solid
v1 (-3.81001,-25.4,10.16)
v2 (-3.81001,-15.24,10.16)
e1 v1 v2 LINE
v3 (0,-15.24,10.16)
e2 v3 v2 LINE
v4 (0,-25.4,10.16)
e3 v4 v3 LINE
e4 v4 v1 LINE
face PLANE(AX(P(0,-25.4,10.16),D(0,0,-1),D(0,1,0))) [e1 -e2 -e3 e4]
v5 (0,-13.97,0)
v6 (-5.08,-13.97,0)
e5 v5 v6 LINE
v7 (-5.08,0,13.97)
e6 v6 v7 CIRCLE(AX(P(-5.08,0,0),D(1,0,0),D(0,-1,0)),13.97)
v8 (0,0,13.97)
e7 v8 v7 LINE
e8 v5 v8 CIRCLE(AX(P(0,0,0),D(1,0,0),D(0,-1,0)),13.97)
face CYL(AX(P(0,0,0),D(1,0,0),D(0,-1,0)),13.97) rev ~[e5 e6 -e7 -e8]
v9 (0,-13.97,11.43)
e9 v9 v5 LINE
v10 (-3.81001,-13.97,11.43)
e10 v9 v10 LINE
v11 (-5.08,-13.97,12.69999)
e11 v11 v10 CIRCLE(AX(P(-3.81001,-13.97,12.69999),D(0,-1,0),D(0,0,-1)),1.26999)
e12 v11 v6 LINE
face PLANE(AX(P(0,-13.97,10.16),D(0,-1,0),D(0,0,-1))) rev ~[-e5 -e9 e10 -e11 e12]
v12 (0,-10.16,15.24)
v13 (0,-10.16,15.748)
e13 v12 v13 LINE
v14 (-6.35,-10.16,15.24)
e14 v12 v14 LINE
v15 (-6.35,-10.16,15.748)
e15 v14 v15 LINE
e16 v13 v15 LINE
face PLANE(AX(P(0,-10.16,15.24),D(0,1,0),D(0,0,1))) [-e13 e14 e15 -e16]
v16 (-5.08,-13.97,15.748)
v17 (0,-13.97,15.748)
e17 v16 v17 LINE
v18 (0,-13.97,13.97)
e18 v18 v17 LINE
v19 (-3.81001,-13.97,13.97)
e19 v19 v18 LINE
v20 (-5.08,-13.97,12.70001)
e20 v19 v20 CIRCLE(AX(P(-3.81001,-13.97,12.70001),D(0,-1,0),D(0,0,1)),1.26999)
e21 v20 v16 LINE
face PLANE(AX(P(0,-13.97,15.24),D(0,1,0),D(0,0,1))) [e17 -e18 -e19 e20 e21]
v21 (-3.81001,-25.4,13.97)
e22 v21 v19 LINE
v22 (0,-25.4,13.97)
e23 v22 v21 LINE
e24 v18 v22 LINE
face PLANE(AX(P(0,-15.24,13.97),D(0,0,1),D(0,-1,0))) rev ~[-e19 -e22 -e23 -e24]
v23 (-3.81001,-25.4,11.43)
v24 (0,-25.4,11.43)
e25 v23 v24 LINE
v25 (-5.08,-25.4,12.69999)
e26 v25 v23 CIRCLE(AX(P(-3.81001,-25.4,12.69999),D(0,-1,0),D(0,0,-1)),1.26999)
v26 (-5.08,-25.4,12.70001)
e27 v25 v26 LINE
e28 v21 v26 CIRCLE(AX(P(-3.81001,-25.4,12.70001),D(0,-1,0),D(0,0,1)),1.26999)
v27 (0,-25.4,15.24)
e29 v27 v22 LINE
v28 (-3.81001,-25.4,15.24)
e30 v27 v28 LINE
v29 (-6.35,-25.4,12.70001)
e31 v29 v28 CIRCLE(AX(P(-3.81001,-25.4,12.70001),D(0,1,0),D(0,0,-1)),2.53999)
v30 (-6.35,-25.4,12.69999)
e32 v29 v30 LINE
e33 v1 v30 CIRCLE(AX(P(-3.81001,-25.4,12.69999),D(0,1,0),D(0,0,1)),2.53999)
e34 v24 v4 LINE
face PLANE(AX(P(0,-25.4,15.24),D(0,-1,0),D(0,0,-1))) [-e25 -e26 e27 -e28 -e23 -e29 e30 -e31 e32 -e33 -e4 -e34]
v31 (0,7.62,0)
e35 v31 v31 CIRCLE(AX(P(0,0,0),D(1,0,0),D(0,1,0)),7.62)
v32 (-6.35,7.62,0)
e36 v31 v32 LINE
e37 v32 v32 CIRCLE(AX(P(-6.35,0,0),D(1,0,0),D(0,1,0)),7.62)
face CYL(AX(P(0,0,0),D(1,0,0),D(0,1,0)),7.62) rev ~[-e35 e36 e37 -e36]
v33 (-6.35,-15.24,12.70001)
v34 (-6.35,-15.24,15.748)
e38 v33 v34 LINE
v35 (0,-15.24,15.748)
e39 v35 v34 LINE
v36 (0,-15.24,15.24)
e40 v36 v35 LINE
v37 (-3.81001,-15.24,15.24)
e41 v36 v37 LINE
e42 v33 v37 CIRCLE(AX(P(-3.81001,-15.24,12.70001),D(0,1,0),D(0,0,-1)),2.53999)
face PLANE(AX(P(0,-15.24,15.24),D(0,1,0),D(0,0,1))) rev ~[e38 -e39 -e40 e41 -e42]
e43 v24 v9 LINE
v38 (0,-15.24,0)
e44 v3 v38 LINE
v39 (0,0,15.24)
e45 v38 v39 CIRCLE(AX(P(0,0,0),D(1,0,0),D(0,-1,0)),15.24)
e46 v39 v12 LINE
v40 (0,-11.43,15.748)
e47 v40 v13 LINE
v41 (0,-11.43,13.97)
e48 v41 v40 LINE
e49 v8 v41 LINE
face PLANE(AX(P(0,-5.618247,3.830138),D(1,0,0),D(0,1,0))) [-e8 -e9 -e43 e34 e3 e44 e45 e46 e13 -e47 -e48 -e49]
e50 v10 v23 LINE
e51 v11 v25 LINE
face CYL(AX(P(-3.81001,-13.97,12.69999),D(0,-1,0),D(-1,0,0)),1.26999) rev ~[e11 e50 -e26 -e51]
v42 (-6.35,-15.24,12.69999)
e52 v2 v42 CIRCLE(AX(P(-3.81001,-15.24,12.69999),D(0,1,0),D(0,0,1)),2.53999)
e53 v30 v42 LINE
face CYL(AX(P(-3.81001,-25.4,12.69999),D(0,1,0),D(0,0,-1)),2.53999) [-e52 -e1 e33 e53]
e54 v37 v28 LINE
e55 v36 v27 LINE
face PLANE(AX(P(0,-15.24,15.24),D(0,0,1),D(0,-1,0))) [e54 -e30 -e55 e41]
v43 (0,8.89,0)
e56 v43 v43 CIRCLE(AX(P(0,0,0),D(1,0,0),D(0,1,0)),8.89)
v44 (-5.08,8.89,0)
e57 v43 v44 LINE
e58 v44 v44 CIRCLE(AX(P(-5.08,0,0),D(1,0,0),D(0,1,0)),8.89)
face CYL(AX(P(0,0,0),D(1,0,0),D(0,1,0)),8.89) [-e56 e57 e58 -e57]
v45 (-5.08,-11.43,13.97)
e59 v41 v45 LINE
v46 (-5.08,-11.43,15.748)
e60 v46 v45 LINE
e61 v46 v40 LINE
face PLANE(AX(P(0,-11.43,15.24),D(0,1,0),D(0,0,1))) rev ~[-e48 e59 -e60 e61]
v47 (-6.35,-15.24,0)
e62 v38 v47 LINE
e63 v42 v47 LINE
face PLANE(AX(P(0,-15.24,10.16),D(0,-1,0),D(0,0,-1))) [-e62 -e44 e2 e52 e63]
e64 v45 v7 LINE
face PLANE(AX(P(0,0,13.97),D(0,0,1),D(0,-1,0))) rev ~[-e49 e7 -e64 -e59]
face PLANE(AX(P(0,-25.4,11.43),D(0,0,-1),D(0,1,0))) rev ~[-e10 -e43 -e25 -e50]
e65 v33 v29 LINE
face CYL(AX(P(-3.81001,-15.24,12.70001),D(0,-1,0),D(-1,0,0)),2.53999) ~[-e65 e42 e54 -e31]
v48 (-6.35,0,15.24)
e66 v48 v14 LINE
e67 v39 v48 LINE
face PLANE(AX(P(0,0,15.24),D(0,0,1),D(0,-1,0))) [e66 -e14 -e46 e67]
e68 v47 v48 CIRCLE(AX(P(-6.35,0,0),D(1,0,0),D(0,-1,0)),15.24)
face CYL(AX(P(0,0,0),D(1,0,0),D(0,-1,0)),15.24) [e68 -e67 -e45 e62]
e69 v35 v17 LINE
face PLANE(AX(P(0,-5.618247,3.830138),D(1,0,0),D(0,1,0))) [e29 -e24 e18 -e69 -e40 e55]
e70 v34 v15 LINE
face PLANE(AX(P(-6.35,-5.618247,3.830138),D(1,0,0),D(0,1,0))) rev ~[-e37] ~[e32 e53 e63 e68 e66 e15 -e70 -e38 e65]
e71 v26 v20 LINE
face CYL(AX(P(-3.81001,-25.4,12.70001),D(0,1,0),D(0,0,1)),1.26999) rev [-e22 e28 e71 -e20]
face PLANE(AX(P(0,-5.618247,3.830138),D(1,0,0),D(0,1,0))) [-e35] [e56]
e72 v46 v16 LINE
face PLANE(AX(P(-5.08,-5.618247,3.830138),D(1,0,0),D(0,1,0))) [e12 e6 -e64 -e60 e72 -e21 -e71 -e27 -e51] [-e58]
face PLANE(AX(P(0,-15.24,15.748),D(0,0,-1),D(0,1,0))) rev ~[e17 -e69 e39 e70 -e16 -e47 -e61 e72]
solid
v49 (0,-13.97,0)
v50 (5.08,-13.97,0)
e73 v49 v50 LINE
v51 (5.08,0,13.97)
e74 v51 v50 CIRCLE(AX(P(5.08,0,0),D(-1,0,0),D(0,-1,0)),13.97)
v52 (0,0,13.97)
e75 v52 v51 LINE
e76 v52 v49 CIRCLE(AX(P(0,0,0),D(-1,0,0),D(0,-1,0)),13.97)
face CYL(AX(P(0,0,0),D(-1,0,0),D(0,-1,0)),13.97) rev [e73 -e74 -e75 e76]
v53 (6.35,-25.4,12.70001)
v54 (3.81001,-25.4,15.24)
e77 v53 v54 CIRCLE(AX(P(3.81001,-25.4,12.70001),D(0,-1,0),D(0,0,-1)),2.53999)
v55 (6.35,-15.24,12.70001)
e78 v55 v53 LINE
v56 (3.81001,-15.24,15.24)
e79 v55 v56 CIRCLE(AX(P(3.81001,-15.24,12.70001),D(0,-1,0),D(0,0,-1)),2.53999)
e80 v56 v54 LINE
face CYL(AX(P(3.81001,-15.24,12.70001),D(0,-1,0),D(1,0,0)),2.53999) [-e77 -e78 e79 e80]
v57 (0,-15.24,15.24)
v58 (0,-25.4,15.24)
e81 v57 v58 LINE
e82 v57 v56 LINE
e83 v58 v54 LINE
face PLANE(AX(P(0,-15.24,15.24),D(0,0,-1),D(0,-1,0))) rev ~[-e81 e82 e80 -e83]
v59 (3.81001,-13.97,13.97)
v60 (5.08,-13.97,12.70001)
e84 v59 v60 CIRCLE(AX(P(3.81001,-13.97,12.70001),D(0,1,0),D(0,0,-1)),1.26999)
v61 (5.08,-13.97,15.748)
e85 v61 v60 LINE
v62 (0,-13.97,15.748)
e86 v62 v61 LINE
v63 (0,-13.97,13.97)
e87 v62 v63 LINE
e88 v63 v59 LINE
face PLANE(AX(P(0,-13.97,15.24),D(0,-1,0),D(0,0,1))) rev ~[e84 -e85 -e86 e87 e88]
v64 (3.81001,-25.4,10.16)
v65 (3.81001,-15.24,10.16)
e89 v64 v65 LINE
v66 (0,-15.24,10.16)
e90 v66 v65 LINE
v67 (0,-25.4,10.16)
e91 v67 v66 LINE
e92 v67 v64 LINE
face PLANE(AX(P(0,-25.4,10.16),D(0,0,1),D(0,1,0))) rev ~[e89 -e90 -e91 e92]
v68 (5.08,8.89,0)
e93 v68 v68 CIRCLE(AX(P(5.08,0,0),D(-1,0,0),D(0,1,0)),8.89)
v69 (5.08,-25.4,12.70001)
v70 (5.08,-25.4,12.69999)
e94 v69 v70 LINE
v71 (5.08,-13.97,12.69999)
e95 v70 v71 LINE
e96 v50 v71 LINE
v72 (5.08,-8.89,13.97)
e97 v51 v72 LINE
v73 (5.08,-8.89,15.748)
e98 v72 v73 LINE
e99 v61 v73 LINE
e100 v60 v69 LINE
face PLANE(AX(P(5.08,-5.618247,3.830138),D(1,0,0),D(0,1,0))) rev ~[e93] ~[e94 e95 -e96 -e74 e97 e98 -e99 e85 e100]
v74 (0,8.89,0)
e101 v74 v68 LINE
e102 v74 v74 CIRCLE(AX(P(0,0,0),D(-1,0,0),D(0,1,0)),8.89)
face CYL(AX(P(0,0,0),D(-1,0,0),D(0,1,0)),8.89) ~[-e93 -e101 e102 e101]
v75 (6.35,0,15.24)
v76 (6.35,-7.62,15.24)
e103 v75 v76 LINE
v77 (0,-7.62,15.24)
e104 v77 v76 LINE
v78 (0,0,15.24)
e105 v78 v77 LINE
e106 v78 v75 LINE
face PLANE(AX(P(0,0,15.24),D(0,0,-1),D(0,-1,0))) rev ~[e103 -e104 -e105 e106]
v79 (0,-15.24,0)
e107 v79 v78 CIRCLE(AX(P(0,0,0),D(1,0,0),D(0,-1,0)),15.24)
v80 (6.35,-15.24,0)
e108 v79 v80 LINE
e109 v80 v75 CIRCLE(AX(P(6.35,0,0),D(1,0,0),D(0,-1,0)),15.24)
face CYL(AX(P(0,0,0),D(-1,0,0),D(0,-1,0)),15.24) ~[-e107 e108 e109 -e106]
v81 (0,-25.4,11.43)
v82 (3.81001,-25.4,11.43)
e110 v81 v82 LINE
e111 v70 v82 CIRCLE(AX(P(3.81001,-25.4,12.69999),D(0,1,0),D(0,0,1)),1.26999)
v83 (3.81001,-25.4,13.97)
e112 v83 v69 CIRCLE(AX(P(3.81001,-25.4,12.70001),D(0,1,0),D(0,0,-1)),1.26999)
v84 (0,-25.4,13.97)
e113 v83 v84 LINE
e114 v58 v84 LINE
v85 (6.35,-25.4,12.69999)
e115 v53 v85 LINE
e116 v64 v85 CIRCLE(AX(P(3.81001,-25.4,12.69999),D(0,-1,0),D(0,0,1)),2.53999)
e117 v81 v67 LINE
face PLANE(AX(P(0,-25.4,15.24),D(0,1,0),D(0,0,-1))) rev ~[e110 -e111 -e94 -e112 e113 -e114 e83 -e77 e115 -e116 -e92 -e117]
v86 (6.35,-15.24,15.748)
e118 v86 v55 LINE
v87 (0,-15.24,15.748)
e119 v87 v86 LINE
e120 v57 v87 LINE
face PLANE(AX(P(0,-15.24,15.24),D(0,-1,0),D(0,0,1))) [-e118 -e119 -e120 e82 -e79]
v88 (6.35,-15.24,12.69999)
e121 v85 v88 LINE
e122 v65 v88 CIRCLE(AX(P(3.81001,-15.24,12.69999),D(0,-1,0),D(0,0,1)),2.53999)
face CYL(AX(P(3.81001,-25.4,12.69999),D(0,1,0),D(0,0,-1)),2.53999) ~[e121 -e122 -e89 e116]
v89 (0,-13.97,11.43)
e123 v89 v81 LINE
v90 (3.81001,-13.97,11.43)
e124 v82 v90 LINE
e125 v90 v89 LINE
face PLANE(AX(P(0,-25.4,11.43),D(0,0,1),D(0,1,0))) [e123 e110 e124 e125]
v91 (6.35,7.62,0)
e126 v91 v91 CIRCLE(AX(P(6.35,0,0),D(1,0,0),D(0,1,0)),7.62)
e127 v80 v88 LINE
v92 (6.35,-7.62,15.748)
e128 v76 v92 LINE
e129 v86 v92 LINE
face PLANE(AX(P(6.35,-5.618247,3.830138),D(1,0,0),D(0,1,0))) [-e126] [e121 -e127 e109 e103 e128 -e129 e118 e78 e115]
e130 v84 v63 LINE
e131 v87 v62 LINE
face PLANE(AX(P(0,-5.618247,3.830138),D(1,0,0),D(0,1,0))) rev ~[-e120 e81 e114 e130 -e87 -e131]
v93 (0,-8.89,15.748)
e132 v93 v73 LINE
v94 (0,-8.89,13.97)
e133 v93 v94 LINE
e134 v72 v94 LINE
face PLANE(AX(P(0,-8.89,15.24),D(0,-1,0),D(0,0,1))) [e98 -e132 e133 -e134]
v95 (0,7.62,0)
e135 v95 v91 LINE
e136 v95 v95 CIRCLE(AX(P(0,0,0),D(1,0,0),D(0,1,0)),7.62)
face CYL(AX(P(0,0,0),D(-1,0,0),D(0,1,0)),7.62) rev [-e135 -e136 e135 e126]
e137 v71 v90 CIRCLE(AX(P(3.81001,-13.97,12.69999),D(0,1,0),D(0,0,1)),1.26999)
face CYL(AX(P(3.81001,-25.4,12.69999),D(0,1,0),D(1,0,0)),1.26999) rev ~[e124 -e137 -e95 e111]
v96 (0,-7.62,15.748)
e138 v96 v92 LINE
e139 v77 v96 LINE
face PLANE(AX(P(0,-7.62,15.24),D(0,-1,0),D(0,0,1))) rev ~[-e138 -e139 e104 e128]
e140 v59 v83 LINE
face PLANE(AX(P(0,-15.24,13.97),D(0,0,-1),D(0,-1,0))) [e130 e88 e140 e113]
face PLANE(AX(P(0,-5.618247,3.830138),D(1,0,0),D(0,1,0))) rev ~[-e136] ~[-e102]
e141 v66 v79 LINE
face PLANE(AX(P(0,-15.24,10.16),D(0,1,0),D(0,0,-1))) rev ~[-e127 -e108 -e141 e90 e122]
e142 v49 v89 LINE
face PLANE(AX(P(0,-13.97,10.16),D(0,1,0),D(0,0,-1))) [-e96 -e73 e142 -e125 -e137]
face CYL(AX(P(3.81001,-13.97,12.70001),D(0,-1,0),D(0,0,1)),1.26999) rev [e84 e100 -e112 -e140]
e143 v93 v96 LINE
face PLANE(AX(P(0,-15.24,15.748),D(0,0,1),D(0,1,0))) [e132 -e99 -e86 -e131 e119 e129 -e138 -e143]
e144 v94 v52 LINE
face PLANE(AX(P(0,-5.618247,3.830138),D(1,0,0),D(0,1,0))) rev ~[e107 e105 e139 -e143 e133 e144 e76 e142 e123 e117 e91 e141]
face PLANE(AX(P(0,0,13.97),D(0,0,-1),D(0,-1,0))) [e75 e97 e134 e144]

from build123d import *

# Parameters (mm, degrees)
F0_R     = 7.62
F0_W     = 5.08
F0_H     = 0.508
F1_DEPTH = 6.35
F2_T     = -1.27
F3_R     = 7.62
F3_W     = 7.62
F3_H     = 0.508
F4_DEPTH = 6.35
F5_T     = -1.27
F6_R     = 2.53999
F6_2_R   = 2.53999
F7_R     = 1.26999
F7_2_R   = 1.26999


# Not quite as in the source:
# - a fillet or chamfer is up to 0.001 mm smaller than in the source, because OpenCascade refuses the exact size


with BuildPart() as f1:
    # F0 (on Right) → F1 (new body)
    with BuildSketch(Plane.YZ):
        with BuildLine():
            Line((-15.24, 15.24), (-25.4, 15.24))
            Line((-25.4, 15.24), (-25.4, 10.16))
            Line((-25.4, 10.16), (-15.24, 10.16))
            Line((-15.24, 10.16), (-15.24, 0))
            ThreePointArc((-15.24, 0), (10.7763073453, -10.7763073453), (0, 15.24))
            Line((0, 15.24), (-10.16, 15.24))
            Line((-10.16, 15.24), (-15.24, 15.24))
        make_face()
        Circle(F0_R, mode=Mode.SUBTRACT)
        with Locations((-12.7, 15.494)):
            Rectangle(F0_W, F0_H)
    extrude(amount=-F1_DEPTH)

    # F2
    f2_openings = [f1.faces().sort_by_distance(p)[0] for p in [
        (-3.175, -25.4, 12.7),
        (-3.175, -12.7, 15.748),
        (0, -5.08, 14.728936),
    ]]
    offset(amount=F2_T, openings=f2_openings, kind=Kind.INTERSECTION)

    # F6 (radius 2.54 in the source; OpenCascade refuses exactly that, so slightly less here)
    f6_edges = [f1.edges().sort_by_distance(p)[0] for p in [
        (-6.35, -20.32, 15.24),
        (-6.35, -20.32, 10.16),
    ]]
    fillet(f6_edges, radius=F6_R)

    # F7 (radius 1.27 in the source; OpenCascade refuses exactly that, so slightly less here)
    f7_edges = [f1.edges().sort_by_distance(p)[0] for p in [
        (-5.08, -19.685, 13.97),
        (-5.08, -19.685, 11.43),
    ]]
    fillet(f7_edges, radius=F7_R)


with BuildPart() as f4:
    # F3 (on Right) → F4 (new body)
    with BuildSketch(Plane.YZ):
        with BuildLine():
            Line((-15.24, 15.24), (-25.4, 15.24))
            Line((-25.4, 15.24), (-25.4, 10.16))
            Line((-25.4, 10.16), (-15.24, 10.16))
            Line((-15.24, 10.16), (-15.24, 0))
            ThreePointArc((-15.24, 0), (10.7763073453, -10.7763073453), (0, 15.24))
            Line((0, 15.24), (-7.62, 15.24))
            Line((-7.62, 15.24), (-15.24, 15.24))
        make_face()
        Circle(F3_R, mode=Mode.SUBTRACT)
        with Locations((-11.43, 15.494)):
            Rectangle(F3_W, F3_H)
    extrude(amount=F4_DEPTH)

    # F5
    f5_openings = [f4.faces().sort_by_distance(p)[0] for p in [
        (3.175, -25.4, 12.7),
        (3.175, -11.43, 15.748),
        (0, -3.81, 14.728936),
    ]]
    offset(amount=F5_T, openings=f5_openings, kind=Kind.INTERSECTION)

    # F6#2 (radius 2.54 in the source; OpenCascade refuses exactly that, so slightly less here)
    f6_2_edges = [f4.edges().sort_by_distance(p)[0] for p in [
        (6.35, -20.32, 15.24),
        (6.35, -20.32, 10.16),
    ]]
    fillet(f6_2_edges, radius=F6_2_R)

    # F7#2 (radius 1.27 in the source; OpenCascade refuses exactly that, so slightly less here)
    f7_2_edges = [f4.edges().sort_by_distance(p)[0] for p in [
        (5.08, -19.685, 11.43),
        (5.08, -19.685, 13.97),
    ]]
    fillet(f7_2_edges, radius=F7_2_R)


solid = Compound([f1.part, f4.part])
